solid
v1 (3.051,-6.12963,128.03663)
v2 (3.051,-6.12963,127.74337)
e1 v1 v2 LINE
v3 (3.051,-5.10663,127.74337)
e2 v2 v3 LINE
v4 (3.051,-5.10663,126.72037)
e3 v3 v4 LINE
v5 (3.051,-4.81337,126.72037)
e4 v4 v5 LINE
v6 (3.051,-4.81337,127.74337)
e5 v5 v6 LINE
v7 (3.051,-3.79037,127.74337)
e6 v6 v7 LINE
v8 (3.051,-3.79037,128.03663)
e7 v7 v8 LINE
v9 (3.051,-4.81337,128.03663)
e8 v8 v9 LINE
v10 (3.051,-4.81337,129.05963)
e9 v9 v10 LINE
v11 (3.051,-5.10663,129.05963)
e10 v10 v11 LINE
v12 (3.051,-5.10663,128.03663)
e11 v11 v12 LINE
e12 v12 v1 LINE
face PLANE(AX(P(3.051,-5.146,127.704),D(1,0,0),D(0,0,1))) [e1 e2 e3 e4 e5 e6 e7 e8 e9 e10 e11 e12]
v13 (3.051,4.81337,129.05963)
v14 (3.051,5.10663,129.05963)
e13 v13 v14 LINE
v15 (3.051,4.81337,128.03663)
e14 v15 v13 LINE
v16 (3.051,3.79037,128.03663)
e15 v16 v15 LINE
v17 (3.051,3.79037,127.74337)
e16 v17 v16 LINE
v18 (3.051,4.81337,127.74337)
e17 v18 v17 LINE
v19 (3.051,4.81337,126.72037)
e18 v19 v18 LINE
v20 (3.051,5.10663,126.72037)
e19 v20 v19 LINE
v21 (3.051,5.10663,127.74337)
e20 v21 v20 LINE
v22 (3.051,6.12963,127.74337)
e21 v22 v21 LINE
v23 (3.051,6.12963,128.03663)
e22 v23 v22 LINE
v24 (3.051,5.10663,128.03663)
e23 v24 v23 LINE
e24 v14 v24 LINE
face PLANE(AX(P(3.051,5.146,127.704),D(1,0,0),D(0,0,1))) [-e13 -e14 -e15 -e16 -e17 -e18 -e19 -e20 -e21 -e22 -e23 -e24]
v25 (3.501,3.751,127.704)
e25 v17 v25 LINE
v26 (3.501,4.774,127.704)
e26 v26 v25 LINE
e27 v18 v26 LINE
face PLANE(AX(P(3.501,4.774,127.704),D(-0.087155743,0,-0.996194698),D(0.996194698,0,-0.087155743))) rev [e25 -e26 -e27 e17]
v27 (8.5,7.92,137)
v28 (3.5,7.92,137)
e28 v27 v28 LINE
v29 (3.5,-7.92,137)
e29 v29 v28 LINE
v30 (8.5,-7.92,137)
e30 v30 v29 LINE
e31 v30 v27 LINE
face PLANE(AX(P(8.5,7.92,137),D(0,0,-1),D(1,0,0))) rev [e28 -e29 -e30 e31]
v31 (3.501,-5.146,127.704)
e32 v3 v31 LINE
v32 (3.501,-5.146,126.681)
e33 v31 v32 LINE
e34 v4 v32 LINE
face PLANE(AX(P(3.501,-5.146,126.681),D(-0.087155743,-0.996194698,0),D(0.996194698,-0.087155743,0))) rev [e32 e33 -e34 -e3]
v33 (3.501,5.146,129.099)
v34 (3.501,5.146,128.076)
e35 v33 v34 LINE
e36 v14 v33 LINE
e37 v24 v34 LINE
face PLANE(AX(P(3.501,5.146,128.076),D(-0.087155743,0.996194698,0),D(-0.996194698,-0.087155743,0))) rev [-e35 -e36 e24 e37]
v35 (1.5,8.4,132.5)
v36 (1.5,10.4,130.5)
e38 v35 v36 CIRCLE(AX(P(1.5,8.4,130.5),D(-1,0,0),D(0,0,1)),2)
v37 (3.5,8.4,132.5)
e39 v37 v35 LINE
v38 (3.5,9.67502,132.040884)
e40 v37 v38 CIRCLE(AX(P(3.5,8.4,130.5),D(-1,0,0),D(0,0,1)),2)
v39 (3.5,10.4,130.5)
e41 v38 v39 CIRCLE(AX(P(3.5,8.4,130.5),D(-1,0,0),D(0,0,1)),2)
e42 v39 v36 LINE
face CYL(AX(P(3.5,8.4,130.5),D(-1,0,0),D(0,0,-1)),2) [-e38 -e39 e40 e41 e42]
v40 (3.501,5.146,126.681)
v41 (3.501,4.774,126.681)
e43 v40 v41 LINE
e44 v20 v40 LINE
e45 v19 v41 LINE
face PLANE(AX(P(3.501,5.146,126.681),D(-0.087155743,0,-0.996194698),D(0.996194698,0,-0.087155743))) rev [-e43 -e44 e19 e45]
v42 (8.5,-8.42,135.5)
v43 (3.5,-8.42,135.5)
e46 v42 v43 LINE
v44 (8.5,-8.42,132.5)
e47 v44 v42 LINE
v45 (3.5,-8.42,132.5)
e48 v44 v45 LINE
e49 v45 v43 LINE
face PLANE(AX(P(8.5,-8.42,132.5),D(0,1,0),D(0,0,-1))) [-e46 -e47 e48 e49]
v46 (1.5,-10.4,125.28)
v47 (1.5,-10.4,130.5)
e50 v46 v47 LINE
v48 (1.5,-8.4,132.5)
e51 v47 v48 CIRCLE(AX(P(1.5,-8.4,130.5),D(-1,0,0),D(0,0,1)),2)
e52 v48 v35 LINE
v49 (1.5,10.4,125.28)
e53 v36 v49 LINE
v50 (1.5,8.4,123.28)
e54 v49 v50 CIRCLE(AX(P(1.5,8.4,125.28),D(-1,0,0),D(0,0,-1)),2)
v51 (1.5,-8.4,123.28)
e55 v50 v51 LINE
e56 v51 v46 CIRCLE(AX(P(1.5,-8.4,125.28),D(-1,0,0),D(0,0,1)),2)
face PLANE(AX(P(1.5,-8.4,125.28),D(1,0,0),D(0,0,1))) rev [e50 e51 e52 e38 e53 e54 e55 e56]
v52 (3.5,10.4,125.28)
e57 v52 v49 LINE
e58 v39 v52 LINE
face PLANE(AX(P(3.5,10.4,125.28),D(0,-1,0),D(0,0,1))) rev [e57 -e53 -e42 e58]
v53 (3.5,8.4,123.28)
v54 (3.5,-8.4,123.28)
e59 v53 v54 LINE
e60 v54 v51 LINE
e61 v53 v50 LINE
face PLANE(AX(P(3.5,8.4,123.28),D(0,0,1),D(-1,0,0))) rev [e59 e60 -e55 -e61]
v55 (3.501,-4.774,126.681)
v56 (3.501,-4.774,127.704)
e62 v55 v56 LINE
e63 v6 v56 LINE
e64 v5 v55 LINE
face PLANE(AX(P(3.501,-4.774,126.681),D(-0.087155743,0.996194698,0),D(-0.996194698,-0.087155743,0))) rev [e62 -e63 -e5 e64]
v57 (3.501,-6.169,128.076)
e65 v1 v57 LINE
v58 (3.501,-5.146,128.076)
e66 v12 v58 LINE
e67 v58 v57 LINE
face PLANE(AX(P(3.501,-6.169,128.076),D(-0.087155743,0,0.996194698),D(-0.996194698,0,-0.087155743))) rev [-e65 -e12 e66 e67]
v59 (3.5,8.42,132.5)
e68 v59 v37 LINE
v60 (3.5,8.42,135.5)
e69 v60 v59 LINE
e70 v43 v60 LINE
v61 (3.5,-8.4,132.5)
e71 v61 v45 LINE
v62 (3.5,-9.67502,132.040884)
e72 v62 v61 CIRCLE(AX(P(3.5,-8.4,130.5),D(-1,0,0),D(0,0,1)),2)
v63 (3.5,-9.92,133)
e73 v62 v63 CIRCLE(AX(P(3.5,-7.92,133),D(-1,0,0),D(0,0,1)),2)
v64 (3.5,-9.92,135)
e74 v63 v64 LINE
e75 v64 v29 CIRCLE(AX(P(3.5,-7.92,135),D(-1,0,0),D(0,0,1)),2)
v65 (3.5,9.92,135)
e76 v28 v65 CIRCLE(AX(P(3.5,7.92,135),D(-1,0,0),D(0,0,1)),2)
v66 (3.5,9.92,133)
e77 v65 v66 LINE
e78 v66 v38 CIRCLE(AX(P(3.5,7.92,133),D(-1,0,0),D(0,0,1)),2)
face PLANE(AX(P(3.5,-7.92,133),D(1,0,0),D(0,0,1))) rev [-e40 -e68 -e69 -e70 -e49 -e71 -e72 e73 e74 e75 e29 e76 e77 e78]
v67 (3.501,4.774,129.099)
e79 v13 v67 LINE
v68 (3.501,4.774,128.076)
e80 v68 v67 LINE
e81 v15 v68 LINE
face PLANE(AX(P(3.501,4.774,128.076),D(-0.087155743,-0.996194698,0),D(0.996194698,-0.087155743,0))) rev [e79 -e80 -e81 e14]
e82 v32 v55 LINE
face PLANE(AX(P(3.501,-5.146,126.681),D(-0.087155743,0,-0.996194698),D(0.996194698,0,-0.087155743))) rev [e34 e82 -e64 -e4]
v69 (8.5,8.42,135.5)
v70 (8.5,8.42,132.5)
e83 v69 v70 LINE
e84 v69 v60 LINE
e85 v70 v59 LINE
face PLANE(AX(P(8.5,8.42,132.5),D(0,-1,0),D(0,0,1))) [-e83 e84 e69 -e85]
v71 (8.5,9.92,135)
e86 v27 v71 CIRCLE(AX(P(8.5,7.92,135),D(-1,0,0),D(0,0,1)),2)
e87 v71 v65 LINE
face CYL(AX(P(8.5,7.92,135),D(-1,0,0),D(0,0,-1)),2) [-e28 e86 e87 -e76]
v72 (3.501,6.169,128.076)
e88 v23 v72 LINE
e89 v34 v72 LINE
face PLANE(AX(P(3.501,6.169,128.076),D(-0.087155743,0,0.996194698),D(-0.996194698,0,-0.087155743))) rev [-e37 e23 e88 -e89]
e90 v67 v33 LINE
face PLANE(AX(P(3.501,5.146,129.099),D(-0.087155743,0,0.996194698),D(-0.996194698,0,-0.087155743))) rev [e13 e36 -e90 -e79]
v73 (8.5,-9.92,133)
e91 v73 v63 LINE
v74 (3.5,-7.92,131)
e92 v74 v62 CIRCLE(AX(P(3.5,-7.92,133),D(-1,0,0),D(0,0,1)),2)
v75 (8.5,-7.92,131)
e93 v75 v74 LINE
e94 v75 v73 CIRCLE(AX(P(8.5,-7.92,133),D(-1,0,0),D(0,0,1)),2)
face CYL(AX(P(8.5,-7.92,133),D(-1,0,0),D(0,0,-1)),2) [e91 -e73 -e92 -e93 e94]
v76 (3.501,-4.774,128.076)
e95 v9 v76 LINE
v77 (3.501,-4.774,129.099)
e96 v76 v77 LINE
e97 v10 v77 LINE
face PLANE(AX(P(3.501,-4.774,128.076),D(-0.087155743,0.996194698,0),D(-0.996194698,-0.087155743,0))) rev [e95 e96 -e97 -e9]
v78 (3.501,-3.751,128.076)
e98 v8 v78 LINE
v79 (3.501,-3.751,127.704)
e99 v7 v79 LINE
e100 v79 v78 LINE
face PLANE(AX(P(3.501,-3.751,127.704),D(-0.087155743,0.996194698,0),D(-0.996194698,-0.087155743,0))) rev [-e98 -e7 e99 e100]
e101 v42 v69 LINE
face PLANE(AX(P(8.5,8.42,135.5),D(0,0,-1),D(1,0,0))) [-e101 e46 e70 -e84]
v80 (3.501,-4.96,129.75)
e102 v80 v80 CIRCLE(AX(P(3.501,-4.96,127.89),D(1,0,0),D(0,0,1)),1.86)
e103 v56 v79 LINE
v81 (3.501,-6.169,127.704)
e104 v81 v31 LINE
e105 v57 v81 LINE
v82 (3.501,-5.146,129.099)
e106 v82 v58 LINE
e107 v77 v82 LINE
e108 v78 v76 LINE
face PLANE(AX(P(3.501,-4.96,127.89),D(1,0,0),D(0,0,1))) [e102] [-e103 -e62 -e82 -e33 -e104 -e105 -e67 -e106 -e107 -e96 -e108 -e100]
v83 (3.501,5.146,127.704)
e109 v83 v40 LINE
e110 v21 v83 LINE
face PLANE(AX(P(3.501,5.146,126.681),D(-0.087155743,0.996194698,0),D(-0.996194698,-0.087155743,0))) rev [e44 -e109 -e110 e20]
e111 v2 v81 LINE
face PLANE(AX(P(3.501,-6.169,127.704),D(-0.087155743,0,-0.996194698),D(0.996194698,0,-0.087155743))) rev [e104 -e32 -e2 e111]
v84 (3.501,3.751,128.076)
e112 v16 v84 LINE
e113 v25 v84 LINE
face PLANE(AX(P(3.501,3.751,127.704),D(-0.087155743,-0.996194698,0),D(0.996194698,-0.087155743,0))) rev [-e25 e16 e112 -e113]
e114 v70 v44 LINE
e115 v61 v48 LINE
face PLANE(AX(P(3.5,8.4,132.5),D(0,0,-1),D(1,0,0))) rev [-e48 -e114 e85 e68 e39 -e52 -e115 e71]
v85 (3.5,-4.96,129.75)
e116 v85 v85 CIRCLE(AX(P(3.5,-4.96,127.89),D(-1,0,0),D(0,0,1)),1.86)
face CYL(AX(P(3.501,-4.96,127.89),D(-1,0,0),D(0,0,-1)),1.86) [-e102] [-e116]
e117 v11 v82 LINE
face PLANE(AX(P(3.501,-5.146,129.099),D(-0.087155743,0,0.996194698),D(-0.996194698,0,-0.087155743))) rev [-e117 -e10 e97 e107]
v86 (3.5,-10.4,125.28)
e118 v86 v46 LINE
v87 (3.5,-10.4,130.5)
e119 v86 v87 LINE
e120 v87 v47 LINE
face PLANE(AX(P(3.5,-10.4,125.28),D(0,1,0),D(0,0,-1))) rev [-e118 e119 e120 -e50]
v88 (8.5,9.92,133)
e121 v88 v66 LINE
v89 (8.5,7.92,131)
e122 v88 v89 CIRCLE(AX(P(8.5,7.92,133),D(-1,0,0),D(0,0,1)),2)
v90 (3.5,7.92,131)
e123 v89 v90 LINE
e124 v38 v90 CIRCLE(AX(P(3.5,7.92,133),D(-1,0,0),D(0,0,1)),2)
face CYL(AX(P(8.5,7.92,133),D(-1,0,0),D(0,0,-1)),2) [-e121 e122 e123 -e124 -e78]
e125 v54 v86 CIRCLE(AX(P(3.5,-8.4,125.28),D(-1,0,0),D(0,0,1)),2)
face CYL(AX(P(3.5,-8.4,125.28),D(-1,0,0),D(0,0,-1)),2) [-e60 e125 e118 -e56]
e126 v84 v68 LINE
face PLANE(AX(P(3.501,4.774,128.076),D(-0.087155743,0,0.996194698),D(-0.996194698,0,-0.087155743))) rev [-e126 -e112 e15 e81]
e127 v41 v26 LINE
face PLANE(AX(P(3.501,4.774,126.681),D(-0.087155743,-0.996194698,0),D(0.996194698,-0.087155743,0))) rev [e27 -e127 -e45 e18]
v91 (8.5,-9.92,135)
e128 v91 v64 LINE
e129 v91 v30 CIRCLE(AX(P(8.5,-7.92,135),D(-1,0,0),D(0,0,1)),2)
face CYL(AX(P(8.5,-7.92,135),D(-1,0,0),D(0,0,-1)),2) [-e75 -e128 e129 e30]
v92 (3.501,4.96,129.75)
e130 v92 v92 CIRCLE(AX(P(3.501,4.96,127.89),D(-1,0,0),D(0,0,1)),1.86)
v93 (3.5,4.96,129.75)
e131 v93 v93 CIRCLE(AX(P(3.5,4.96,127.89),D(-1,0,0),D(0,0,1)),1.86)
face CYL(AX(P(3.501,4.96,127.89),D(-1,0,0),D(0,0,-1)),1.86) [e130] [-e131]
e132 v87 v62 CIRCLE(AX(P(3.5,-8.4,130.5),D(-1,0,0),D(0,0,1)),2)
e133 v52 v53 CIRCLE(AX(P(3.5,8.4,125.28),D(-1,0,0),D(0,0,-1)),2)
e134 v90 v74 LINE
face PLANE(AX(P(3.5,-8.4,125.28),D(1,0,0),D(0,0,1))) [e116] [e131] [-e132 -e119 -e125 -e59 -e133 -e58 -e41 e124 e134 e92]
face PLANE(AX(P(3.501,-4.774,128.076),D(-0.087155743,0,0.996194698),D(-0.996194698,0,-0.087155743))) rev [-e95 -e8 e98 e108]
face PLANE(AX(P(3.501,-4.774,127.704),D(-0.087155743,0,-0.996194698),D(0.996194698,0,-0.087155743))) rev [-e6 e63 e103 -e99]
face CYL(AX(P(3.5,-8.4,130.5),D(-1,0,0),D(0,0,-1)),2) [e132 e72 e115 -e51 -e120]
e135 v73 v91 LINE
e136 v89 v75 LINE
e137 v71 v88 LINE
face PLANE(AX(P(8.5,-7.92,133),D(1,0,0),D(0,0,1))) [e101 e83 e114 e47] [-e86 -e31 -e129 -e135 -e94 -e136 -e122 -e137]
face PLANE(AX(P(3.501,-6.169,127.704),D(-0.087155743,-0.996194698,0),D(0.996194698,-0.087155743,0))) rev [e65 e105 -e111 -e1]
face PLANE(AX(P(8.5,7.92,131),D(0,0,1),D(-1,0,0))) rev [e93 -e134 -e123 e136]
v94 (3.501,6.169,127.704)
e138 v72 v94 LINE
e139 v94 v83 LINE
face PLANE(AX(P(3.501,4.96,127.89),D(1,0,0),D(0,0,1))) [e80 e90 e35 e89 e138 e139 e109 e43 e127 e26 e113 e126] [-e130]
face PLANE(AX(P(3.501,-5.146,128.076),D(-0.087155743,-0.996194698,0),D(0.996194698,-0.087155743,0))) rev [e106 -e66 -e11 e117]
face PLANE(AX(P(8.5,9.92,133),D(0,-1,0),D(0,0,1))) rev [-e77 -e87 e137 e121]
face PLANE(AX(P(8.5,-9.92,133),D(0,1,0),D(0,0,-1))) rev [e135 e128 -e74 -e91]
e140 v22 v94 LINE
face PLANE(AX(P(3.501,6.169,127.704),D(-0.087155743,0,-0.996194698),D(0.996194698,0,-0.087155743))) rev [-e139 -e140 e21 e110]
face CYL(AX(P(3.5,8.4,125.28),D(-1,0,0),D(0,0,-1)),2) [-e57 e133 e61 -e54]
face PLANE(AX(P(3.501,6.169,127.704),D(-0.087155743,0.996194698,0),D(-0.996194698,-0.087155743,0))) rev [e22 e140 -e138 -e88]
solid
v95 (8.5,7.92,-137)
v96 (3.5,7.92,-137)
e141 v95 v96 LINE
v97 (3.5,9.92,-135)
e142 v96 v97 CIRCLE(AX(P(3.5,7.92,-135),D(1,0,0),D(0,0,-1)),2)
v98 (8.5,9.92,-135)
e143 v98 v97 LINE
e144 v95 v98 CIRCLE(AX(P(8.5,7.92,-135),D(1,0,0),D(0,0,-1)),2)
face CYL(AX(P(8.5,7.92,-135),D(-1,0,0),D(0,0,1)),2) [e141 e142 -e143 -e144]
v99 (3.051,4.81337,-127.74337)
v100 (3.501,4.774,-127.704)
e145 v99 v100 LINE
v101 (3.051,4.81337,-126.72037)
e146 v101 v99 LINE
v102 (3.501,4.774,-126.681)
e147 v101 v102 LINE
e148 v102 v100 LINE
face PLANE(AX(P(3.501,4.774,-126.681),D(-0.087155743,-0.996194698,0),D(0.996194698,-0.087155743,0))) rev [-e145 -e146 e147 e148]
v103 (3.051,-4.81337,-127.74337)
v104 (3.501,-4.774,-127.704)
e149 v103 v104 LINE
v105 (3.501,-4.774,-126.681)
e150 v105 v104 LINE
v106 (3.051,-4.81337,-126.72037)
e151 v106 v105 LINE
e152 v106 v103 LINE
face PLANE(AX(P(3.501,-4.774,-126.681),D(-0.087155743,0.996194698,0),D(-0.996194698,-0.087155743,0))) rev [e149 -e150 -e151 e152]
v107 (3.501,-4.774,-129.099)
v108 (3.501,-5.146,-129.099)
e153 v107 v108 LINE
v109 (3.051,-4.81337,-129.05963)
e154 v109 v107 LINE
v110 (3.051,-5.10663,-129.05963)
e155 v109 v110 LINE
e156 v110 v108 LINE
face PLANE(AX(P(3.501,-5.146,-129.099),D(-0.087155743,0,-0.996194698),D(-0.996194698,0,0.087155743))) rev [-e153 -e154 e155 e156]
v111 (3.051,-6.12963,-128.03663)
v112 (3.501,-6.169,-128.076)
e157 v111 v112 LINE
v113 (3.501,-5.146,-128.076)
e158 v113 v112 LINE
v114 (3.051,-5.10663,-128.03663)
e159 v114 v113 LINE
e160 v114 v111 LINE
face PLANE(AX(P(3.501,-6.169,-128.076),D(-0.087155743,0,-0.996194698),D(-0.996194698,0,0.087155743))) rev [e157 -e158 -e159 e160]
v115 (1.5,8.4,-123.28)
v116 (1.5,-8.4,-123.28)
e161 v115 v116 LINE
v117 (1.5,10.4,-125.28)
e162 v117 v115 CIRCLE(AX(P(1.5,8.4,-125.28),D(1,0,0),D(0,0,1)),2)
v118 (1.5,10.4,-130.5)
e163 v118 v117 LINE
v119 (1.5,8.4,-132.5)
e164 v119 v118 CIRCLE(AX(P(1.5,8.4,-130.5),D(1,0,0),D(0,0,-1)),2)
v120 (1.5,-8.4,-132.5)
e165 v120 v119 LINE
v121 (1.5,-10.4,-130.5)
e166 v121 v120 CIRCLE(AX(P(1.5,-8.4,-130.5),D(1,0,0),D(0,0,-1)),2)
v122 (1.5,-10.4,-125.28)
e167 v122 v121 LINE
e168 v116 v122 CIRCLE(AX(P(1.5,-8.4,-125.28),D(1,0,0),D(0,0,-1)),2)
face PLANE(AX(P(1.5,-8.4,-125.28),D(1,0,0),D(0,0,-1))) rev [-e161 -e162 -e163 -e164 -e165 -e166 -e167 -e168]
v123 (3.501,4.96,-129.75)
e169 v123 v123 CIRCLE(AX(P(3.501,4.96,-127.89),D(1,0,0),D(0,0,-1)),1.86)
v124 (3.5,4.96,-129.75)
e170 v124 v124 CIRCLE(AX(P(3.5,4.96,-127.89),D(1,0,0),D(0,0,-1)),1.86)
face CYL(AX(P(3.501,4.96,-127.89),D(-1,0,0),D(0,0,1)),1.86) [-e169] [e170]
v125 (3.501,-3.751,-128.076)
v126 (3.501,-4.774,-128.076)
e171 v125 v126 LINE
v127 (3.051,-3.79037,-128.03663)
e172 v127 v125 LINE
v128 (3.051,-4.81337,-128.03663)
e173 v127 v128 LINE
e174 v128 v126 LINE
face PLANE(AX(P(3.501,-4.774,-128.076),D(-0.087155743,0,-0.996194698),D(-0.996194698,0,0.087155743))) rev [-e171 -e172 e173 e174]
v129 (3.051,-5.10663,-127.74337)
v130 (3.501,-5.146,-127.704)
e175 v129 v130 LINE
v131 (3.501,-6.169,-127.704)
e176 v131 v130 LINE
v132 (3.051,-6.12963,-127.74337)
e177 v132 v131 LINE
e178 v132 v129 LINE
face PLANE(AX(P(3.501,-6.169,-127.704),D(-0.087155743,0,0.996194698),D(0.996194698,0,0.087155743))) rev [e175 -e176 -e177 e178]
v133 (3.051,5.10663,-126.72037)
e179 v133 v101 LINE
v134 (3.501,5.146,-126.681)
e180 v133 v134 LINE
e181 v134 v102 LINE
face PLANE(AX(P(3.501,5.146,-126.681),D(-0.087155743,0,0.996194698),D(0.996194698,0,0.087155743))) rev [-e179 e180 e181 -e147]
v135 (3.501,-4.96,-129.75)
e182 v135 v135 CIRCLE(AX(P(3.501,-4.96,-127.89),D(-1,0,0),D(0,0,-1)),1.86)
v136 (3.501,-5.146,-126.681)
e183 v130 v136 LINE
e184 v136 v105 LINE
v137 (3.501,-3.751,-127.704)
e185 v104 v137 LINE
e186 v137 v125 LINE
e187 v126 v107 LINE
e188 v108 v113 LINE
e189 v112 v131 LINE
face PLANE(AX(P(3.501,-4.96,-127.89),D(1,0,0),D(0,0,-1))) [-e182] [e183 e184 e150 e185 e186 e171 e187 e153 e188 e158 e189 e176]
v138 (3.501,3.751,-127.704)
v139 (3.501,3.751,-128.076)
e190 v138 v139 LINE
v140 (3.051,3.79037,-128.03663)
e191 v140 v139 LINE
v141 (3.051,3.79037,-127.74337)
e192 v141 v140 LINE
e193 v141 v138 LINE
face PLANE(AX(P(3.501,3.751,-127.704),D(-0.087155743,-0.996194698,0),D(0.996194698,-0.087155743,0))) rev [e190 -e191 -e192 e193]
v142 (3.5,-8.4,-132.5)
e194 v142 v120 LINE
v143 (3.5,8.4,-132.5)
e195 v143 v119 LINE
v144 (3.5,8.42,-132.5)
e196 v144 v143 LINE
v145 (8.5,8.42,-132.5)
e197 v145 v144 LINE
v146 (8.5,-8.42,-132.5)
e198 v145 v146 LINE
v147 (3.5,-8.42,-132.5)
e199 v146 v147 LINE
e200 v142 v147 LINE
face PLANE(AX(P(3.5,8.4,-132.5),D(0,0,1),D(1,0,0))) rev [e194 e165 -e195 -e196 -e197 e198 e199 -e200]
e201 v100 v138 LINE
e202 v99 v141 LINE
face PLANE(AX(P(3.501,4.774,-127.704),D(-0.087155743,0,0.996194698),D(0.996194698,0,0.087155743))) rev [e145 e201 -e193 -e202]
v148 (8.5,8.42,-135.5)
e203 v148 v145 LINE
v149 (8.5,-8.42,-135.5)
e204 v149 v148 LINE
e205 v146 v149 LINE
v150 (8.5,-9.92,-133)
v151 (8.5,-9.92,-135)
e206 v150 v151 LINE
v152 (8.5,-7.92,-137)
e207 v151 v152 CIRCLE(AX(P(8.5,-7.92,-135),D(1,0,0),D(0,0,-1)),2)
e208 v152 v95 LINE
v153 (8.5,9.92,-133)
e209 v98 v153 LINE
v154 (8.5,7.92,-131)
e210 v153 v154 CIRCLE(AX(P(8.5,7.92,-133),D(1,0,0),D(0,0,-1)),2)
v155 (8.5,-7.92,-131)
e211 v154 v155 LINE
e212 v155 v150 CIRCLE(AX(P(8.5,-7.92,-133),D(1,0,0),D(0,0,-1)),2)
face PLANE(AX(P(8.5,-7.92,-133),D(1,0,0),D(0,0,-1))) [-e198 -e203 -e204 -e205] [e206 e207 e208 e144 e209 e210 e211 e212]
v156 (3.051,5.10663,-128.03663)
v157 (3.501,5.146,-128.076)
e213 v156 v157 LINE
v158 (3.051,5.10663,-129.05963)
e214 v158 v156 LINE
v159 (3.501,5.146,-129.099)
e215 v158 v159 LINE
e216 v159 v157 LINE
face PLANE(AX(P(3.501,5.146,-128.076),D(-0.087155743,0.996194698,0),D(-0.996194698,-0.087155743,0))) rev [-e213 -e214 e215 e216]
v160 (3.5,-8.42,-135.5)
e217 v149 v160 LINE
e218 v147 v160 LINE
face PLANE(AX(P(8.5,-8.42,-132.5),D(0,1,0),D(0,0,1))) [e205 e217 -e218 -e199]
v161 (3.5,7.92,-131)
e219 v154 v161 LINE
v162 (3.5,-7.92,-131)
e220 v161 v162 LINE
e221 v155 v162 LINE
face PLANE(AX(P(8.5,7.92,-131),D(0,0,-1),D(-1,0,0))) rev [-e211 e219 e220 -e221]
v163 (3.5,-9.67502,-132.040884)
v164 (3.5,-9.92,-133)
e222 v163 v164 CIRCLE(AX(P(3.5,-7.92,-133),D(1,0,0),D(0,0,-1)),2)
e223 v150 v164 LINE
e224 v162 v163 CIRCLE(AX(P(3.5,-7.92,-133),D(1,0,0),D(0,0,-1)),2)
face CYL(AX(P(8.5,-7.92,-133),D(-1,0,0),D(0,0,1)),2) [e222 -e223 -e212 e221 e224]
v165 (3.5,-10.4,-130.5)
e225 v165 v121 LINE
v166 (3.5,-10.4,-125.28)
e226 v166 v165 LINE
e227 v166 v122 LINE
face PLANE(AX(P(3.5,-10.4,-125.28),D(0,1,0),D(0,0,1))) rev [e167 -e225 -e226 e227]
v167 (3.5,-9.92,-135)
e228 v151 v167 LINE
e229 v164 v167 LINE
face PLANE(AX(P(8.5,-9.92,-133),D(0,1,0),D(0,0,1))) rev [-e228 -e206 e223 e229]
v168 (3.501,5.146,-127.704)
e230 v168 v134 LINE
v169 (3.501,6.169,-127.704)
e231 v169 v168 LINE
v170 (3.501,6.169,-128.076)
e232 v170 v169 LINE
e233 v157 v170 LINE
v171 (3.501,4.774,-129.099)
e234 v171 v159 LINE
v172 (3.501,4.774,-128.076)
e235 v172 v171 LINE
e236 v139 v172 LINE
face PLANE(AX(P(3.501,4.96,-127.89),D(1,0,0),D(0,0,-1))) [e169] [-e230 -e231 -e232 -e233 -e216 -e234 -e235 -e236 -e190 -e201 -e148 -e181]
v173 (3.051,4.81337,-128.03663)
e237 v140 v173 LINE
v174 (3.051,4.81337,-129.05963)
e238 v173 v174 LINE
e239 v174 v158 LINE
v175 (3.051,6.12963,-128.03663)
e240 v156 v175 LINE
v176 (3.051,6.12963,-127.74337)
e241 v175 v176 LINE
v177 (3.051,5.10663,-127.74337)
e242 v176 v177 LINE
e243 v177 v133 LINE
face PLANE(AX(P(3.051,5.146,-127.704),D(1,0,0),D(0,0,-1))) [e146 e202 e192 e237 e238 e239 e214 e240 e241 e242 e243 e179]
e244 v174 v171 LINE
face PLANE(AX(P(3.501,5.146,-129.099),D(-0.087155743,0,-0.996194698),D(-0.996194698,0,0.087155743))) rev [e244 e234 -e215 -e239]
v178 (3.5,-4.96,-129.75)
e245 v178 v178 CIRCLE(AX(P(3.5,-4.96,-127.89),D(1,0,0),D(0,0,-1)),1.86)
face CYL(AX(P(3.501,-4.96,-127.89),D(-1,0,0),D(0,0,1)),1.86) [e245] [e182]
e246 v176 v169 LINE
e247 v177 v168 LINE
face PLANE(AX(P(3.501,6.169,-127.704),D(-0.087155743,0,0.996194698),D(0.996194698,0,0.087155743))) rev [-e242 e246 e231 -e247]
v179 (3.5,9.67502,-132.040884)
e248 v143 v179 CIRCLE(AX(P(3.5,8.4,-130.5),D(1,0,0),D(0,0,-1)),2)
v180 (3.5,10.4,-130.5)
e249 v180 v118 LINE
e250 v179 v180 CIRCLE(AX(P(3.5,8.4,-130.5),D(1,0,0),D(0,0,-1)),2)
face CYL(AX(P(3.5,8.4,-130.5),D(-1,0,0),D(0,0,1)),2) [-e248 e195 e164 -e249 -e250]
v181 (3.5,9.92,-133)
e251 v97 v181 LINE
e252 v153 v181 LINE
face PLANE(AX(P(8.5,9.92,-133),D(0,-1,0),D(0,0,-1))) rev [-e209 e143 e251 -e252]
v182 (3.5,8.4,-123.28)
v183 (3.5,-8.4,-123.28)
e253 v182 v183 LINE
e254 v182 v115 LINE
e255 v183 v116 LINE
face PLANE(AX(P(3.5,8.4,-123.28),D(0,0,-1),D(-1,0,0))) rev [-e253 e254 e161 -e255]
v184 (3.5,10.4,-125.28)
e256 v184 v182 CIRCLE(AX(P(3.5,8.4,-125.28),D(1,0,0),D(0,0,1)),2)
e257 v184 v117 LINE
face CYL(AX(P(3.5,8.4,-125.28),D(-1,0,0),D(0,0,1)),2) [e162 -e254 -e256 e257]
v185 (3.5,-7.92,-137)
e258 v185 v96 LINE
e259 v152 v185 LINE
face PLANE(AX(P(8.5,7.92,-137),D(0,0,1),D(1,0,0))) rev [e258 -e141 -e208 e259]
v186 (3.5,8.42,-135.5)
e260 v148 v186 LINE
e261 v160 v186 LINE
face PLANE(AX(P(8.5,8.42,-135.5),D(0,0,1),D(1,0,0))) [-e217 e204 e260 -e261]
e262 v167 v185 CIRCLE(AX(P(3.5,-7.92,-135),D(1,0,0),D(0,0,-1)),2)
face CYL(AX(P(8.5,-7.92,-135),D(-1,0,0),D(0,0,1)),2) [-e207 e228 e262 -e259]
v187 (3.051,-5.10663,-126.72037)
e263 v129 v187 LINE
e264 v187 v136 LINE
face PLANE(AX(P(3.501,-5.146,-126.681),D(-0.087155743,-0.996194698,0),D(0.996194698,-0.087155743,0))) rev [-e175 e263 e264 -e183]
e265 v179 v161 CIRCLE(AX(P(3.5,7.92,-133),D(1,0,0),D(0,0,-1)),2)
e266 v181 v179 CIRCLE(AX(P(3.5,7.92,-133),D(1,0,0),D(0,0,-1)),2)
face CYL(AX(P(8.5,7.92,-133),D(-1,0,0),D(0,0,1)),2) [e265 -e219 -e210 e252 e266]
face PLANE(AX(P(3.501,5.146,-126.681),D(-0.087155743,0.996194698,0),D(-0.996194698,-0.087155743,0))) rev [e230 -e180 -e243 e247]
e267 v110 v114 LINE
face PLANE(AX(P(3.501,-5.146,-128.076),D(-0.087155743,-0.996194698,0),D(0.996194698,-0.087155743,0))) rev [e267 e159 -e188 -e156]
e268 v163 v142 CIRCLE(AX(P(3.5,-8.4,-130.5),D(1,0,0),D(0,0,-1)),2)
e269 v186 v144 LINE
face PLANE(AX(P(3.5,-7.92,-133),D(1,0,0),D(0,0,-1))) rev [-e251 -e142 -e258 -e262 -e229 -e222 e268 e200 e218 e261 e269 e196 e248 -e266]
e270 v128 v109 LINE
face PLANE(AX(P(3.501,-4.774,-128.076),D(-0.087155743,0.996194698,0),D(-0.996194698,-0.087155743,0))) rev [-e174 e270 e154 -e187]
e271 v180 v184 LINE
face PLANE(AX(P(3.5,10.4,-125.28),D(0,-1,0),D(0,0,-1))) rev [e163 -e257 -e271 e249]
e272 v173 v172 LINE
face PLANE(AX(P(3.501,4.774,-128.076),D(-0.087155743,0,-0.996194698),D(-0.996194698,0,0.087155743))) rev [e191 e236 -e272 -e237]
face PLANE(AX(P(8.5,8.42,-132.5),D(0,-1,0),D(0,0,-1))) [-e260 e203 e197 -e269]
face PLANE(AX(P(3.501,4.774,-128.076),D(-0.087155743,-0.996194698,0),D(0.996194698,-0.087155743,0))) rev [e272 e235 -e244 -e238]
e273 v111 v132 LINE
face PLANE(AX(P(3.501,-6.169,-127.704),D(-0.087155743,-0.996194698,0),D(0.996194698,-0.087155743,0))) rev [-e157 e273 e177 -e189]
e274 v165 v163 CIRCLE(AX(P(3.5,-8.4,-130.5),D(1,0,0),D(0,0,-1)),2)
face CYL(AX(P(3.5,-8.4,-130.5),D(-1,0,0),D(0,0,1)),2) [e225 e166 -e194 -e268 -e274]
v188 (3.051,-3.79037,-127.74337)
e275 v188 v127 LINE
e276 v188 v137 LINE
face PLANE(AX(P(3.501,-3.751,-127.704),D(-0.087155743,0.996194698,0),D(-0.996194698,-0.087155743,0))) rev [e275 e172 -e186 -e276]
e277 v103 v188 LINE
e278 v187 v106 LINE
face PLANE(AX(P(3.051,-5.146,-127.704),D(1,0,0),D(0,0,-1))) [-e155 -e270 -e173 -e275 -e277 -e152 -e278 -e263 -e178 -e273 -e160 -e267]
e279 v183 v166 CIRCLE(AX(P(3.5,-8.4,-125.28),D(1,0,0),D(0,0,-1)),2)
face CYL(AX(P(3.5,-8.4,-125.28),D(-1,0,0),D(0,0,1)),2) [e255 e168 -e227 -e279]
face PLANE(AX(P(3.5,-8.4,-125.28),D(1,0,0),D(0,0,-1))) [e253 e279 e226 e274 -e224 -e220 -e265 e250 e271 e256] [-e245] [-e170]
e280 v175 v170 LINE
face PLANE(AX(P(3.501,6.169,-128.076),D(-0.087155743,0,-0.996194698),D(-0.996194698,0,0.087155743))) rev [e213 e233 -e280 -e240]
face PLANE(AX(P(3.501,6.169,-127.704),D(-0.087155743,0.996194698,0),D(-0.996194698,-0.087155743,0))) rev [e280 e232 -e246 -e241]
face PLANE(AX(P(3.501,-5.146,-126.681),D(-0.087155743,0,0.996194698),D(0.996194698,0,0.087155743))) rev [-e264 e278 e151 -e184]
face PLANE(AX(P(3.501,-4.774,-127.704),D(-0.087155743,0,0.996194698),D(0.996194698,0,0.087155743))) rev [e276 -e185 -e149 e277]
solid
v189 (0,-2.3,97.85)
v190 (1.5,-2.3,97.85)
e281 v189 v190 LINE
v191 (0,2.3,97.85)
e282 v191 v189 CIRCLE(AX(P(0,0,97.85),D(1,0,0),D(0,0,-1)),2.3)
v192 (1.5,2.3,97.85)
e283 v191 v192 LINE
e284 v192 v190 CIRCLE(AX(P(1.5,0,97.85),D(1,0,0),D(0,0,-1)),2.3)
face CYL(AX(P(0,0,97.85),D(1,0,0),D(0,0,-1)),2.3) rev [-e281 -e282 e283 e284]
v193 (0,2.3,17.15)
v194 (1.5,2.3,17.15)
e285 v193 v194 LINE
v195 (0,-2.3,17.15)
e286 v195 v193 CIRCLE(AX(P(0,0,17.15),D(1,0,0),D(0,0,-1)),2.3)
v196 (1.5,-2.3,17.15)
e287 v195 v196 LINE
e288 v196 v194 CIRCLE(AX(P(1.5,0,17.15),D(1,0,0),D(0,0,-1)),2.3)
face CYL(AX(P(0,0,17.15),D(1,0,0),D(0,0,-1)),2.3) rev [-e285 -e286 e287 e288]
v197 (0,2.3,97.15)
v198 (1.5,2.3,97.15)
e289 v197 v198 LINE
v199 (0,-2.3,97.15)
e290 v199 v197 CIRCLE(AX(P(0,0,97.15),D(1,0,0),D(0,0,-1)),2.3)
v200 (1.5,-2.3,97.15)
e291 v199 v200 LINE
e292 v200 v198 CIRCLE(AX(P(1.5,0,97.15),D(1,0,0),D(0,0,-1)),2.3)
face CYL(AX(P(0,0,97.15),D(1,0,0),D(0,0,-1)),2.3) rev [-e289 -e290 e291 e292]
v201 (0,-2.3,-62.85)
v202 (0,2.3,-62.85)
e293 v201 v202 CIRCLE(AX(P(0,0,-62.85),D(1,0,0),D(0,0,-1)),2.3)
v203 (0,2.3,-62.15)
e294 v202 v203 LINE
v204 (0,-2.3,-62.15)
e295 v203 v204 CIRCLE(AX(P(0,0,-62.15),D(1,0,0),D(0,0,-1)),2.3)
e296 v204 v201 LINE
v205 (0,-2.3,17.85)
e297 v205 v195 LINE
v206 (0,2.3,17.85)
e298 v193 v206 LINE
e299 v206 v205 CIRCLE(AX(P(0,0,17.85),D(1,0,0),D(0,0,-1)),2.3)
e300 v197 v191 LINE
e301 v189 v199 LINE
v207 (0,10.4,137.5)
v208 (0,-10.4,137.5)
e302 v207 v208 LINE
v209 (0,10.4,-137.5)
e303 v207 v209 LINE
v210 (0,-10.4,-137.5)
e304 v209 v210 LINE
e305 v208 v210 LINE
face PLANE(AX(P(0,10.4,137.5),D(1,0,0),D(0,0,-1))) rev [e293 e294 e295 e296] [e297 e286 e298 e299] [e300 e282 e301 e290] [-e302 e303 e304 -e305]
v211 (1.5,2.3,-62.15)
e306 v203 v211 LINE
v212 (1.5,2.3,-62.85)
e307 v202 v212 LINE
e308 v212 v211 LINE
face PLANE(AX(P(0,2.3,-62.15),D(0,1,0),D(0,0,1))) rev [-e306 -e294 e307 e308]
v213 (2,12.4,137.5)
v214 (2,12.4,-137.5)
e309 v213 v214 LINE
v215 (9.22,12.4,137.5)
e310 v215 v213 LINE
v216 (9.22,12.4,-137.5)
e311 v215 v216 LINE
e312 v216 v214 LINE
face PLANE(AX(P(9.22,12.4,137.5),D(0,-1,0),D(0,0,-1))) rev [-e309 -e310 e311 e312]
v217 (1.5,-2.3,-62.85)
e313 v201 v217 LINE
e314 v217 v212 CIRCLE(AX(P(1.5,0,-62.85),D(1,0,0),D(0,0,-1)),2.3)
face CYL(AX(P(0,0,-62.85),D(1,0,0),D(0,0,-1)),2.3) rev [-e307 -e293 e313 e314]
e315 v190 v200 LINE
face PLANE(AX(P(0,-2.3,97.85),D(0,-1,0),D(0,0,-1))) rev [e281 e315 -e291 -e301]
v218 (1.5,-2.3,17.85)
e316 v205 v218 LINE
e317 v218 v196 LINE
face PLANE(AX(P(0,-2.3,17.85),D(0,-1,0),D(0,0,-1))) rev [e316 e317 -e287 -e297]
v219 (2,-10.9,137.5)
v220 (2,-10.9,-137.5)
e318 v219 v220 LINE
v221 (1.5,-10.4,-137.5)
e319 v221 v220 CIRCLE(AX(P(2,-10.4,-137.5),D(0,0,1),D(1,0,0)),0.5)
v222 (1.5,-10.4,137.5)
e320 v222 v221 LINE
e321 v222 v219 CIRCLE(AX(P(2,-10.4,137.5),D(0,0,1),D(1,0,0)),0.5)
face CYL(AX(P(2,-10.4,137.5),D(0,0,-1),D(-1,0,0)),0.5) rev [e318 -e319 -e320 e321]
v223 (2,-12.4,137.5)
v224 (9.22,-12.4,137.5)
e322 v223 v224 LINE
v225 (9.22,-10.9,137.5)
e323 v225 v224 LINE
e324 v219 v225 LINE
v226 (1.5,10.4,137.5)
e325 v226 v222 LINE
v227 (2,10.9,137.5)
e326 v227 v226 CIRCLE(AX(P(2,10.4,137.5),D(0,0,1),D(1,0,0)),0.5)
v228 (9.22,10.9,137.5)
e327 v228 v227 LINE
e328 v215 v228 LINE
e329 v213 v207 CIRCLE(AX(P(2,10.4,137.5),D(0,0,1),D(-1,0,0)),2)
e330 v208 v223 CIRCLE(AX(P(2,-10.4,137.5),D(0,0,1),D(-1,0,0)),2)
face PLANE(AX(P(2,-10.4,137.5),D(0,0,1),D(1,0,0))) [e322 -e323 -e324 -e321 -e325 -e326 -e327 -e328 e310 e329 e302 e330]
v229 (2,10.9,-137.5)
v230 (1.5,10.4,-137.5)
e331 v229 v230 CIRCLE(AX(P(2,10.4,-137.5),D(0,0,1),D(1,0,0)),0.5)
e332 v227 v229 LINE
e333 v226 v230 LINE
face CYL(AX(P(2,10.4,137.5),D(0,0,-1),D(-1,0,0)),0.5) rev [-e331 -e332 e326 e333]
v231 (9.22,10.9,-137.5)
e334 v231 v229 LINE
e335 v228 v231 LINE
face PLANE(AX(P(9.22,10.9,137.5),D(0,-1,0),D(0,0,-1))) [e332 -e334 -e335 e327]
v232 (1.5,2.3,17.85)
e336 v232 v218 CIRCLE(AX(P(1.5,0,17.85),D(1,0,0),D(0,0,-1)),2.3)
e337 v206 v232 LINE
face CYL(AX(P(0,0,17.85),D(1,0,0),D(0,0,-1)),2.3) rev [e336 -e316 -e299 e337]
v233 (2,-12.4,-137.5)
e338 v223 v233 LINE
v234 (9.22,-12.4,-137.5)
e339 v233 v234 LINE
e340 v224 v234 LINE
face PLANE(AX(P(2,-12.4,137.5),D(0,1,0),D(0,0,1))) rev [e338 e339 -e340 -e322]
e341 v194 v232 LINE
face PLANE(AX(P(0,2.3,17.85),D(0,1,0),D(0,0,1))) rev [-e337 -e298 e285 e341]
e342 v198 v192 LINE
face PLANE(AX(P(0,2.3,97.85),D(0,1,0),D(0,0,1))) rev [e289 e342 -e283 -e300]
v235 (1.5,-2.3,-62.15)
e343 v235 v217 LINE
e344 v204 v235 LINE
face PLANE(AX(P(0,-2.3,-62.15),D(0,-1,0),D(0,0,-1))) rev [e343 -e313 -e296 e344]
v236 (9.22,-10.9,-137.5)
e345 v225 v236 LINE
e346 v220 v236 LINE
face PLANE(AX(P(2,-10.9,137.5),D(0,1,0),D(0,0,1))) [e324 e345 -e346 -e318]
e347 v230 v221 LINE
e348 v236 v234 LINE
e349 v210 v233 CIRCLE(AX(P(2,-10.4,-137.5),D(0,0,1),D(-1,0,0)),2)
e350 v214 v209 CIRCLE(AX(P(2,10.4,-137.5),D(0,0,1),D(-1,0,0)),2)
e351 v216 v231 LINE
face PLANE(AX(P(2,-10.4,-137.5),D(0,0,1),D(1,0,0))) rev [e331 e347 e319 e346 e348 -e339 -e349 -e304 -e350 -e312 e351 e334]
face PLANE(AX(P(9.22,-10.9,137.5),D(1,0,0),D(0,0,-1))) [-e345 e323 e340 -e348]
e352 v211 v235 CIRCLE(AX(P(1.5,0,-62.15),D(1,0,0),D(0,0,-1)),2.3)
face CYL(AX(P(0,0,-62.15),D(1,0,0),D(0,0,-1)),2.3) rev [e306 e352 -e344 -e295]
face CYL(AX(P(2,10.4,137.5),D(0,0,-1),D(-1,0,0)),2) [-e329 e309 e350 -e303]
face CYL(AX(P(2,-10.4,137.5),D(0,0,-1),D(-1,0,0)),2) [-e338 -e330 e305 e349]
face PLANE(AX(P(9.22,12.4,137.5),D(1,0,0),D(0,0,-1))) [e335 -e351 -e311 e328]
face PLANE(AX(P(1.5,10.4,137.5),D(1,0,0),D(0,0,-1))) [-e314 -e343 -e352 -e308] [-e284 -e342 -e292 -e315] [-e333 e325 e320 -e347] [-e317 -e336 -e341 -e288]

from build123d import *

# Parameters (mm, degrees)
EXTRUDE_THIN1_START  = -137.5
EXTRUDE_THIN1_DEPTH  = 275
BOSS_EXTRUDE1_DEPTH  = 2
SKETCH3_R            = 1.86
BOSS_EXTRUDE2_DEPTH  = 0.001
CUT_EXTRUDE1_DEPTH   = 0.45
CUT_EXTRUDE1_DRAFT   = -5
MIRROR1_COPY_1_DEPTH = 0.45
MIRROR1_COPY_1_DRAFT = -5
SKETCH7_W            = 3
SKETCH7_H            = 16.84
BOSS_EXTRUDE3_DEPTH  = 5
CUT_EXTRUDE2_DEPTH   = 139.273672114
LPATTERN1_COUNT      = 3
LPATTERN1_PITCH      = 80


# Read off the part's stored shape, not the designer's step: Extrude-Thin1
with BuildPart() as part:
    # Extrude-Thin1 outline → Extrude-Thin1 (new body)
    with BuildSketch(Plane.XY.offset(EXTRUDE_THIN1_START)):
        with BuildLine():
            Line((2, -12.4), (9.22, -12.4))
            Line((9.22, -12.4), (9.22, -10.9))
            Line((9.22, -10.9), (2, -10.9))
            ThreePointArc((2, -10.9), (1.646446609, -10.753553391), (1.5, -10.4))
            Line((1.5, -10.4), (1.5, 10.4))
            ThreePointArc((1.5, 10.4), (1.646446609, 10.753553391), (2, 10.9))
            Line((2, 10.9), (9.22, 10.9))
            Line((9.22, 10.9), (9.22, 12.4))
            Line((9.22, 12.4), (2, 12.4))
            ThreePointArc((2, 12.4), (0.585786438, 11.814213562), (0, 10.4))
            Line((0, 10.4), (0, -10.4))
            ThreePointArc((0, -10.4), (0.585786438, -11.814213562), (2, -12.4))
        make_face()
    extrude(amount=EXTRUDE_THIN1_DEPTH)

    # Sketch8 → Cut-Extrude2 (cut, through all)
    with BuildSketch(Plane(origin=(1.5, 0, 0), x_dir=(0, 0, -1), z_dir=(1, 0, 0))):
        with BuildLine():
            Line((-97.85, 2.3), (-97.15, 2.3))
            ThreePointArc((-97.15, 2.3), (-94.85, 0), (-97.15, -2.3))
            Line((-97.15, -2.3), (-97.85, -2.3))
            ThreePointArc((-97.85, -2.3), (-100.15, 0), (-97.85, 2.3))
        make_face()
    cut_extrude2 = extrude(amount=-CUT_EXTRUDE2_DEPTH, mode=Mode.SUBTRACT)

    # LPattern1: Cut-Extrude2 ×3
    with Locations(*[(0, 0, -i * LPATTERN1_PITCH) for i in range(1, LPATTERN1_COUNT)]):
        add(cut_extrude2, mode=Mode.SUBTRACT)


with BuildPart() as body_2:
    # Sketch2 → Boss-Extrude1 (new body)
    with BuildSketch(Plane(origin=(1.5, 0, 0), x_dir=(0, 0, -1), z_dir=(1, 0, 0))):
        with BuildLine():
            Line((125.28, 10.4), (130.5, 10.4))
            ThreePointArc((130.5, 10.4), (131.914213562, 9.814213562), (132.5, 8.4))
            Line((132.5, 8.4), (132.5, -8.4))
            ThreePointArc((132.5, -8.4), (131.914213562, -9.814213562), (130.5, -10.4))
            Line((130.5, -10.4), (125.28, -10.4))
            ThreePointArc((125.28, -10.4), (123.865786438, -9.814213562), (123.28, -8.4))
            Line((123.28, -8.4), (123.28, 8.4))
            ThreePointArc((123.28, 8.4), (123.865786438, 9.814213562), (125.28, 10.4))
        make_face()
    extrude(amount=BOSS_EXTRUDE1_DEPTH)

    # Sketch3 → Boss-Extrude2 (add)
    with BuildSketch(Plane(origin=(3.5, 0, 0), x_dir=(0, 0, -1), z_dir=(1, 0, 0))):
        with Locations((127.89, 4.96)):
            Circle(SKETCH3_R)
    boss_extrude2 = extrude(amount=BOSS_EXTRUDE2_DEPTH)


with BuildPart() as cut_extrude1_tool:
    # Sketch5 → Cut-Extrude1 (with draft: the straight prism first)
    with BuildSketch(Plane(origin=(3.501, 0, 0), x_dir=(0, 0, -1), z_dir=(1, 0, 0))):
        Polygon((127.704, 4.774), (127.704, 3.751), (128.076, 3.751), (128.076, 4.774), (129.099, 4.774), (129.099, 5.146), (128.076, 5.146), (128.076, 6.169), (127.704, 6.169), (127.704, 5.146), (126.681, 5.146), (126.681, 4.774), align=None)
    extrude(amount=-CUT_EXTRUDE1_DEPTH)
    # Cut-Extrude1: the draft: its side faces are tilted about the plane it starts from
    cut_extrude1_sides = [cut_extrude1_tool.faces().sort_by_distance(p)[0] for p in [
        (3.276, 4.2625, -127.704),
        (3.276, 3.751, -127.89),
        (3.276, 4.2625, -128.076),
        (3.276, 4.774, -128.5875),
        (3.276, 4.96, -129.099),
        (3.276, 5.146, -128.5875),
        (3.276, 5.6575, -128.076),
        (3.276, 6.169, -127.89),
        (3.276, 5.6575, -127.704),
        (3.276, 5.146, -127.1925),
        (3.276, 4.96, -126.681),
        (3.276, 4.774, -127.1925),
    ]]
    draft(cut_extrude1_sides, Plane(origin=(3.501, 0, 0), x_dir=(0, 0, -1), z_dir=(1, 0, 0)), CUT_EXTRUDE1_DRAFT)


with BuildPart() as body_2_1:
    add(body_2.part)

    # Cut-Extrude1: cut by cut_extrude1_tool
    add(cut_extrude1_tool.part, mode=Mode.SUBTRACT)

    # Mirror1: Boss-Extrude2 across plane
    add(boss_extrude2.mirror(Plane.ZX))


with BuildPart() as mirror1_copy_1_tool:
    # Mirror1 copy 1 sketch → Mirror1 copy 1 (with draft: the straight prism first)
    with BuildSketch(Plane(origin=(3.501, 0, 0), x_dir=(0, 0, -1), z_dir=(1, 0, 0))):
        Polygon((127.704, -4.774), (127.704, -3.751), (128.076, -3.751), (128.076, -4.774), (129.099, -4.774), (129.099, -5.146), (128.076, -5.146), (128.076, -6.169), (127.704, -6.169), (127.704, -5.146), (126.681, -5.146), (126.681, -4.774), align=None)
    extrude(amount=-MIRROR1_COPY_1_DEPTH)
    # Mirror1 copy 1: the draft: its side faces are tilted about the plane it starts from
    mirror1_copy_1_sides = [mirror1_copy_1_tool.faces().sort_by_distance(p)[0] for p in [
        (3.276, -4.2625, -127.704),
        (3.276, -3.751, -127.89),
        (3.276, -4.2625, -128.076),
        (3.276, -4.774, -128.5875),
        (3.276, -4.96, -129.099),
        (3.276, -5.146, -128.5875),
        (3.276, -5.6575, -128.076),
        (3.276, -6.169, -127.89),
        (3.276, -5.6575, -127.704),
        (3.276, -5.146, -127.1925),
        (3.276, -4.96, -126.681),
        (3.276, -4.774, -127.1925),
    ]]
    draft(mirror1_copy_1_sides, Plane(origin=(3.501, 0, 0), x_dir=(0, 0, -1), z_dir=(1, 0, 0)), MIRROR1_COPY_1_DRAFT)


with BuildPart() as body_2_2:
    add(body_2_1.part)

    # Mirror1 copy 1: cut by mirror1_copy_1_tool
    add(mirror1_copy_1_tool.part, mode=Mode.SUBTRACT)

    # Sketch7 → Boss-Extrude3 (add)
    with BuildSketch(Plane(origin=(3.5, 0, 0), x_dir=(0, 0, -1), z_dir=(1, 0, 0))):
        with BuildLine():
            Line((133, 9.92), (135, 9.92))
            ThreePointArc((135, 9.92), (136.414213562, 9.334213562), (137, 7.92))
            Line((137, 7.92), (137, -7.92))
            ThreePointArc((137, -7.92), (136.414213562, -9.334213562), (135, -9.92))
            Line((135, -9.92), (133, -9.92))
            ThreePointArc((133, -9.92), (131.585786438, -9.334213562), (131, -7.92))
            Line((131, -7.92), (131, 7.92))
            ThreePointArc((131, 7.92), (131.585786438, 9.334213562), (133, 9.92))
        make_face()
        with Locations((134, 0)):
            Rectangle(SKETCH7_W, SKETCH7_H, mode=Mode.SUBTRACT)
    extrude(amount=BOSS_EXTRUDE3_DEPTH)


with BuildPart() as body_3:
    # Mirror2: mirrored copy
    add(body_2_2.part.mirror(Plane.XY))


solid = Compound([part.part, body_2_2.part, body_3.part])
